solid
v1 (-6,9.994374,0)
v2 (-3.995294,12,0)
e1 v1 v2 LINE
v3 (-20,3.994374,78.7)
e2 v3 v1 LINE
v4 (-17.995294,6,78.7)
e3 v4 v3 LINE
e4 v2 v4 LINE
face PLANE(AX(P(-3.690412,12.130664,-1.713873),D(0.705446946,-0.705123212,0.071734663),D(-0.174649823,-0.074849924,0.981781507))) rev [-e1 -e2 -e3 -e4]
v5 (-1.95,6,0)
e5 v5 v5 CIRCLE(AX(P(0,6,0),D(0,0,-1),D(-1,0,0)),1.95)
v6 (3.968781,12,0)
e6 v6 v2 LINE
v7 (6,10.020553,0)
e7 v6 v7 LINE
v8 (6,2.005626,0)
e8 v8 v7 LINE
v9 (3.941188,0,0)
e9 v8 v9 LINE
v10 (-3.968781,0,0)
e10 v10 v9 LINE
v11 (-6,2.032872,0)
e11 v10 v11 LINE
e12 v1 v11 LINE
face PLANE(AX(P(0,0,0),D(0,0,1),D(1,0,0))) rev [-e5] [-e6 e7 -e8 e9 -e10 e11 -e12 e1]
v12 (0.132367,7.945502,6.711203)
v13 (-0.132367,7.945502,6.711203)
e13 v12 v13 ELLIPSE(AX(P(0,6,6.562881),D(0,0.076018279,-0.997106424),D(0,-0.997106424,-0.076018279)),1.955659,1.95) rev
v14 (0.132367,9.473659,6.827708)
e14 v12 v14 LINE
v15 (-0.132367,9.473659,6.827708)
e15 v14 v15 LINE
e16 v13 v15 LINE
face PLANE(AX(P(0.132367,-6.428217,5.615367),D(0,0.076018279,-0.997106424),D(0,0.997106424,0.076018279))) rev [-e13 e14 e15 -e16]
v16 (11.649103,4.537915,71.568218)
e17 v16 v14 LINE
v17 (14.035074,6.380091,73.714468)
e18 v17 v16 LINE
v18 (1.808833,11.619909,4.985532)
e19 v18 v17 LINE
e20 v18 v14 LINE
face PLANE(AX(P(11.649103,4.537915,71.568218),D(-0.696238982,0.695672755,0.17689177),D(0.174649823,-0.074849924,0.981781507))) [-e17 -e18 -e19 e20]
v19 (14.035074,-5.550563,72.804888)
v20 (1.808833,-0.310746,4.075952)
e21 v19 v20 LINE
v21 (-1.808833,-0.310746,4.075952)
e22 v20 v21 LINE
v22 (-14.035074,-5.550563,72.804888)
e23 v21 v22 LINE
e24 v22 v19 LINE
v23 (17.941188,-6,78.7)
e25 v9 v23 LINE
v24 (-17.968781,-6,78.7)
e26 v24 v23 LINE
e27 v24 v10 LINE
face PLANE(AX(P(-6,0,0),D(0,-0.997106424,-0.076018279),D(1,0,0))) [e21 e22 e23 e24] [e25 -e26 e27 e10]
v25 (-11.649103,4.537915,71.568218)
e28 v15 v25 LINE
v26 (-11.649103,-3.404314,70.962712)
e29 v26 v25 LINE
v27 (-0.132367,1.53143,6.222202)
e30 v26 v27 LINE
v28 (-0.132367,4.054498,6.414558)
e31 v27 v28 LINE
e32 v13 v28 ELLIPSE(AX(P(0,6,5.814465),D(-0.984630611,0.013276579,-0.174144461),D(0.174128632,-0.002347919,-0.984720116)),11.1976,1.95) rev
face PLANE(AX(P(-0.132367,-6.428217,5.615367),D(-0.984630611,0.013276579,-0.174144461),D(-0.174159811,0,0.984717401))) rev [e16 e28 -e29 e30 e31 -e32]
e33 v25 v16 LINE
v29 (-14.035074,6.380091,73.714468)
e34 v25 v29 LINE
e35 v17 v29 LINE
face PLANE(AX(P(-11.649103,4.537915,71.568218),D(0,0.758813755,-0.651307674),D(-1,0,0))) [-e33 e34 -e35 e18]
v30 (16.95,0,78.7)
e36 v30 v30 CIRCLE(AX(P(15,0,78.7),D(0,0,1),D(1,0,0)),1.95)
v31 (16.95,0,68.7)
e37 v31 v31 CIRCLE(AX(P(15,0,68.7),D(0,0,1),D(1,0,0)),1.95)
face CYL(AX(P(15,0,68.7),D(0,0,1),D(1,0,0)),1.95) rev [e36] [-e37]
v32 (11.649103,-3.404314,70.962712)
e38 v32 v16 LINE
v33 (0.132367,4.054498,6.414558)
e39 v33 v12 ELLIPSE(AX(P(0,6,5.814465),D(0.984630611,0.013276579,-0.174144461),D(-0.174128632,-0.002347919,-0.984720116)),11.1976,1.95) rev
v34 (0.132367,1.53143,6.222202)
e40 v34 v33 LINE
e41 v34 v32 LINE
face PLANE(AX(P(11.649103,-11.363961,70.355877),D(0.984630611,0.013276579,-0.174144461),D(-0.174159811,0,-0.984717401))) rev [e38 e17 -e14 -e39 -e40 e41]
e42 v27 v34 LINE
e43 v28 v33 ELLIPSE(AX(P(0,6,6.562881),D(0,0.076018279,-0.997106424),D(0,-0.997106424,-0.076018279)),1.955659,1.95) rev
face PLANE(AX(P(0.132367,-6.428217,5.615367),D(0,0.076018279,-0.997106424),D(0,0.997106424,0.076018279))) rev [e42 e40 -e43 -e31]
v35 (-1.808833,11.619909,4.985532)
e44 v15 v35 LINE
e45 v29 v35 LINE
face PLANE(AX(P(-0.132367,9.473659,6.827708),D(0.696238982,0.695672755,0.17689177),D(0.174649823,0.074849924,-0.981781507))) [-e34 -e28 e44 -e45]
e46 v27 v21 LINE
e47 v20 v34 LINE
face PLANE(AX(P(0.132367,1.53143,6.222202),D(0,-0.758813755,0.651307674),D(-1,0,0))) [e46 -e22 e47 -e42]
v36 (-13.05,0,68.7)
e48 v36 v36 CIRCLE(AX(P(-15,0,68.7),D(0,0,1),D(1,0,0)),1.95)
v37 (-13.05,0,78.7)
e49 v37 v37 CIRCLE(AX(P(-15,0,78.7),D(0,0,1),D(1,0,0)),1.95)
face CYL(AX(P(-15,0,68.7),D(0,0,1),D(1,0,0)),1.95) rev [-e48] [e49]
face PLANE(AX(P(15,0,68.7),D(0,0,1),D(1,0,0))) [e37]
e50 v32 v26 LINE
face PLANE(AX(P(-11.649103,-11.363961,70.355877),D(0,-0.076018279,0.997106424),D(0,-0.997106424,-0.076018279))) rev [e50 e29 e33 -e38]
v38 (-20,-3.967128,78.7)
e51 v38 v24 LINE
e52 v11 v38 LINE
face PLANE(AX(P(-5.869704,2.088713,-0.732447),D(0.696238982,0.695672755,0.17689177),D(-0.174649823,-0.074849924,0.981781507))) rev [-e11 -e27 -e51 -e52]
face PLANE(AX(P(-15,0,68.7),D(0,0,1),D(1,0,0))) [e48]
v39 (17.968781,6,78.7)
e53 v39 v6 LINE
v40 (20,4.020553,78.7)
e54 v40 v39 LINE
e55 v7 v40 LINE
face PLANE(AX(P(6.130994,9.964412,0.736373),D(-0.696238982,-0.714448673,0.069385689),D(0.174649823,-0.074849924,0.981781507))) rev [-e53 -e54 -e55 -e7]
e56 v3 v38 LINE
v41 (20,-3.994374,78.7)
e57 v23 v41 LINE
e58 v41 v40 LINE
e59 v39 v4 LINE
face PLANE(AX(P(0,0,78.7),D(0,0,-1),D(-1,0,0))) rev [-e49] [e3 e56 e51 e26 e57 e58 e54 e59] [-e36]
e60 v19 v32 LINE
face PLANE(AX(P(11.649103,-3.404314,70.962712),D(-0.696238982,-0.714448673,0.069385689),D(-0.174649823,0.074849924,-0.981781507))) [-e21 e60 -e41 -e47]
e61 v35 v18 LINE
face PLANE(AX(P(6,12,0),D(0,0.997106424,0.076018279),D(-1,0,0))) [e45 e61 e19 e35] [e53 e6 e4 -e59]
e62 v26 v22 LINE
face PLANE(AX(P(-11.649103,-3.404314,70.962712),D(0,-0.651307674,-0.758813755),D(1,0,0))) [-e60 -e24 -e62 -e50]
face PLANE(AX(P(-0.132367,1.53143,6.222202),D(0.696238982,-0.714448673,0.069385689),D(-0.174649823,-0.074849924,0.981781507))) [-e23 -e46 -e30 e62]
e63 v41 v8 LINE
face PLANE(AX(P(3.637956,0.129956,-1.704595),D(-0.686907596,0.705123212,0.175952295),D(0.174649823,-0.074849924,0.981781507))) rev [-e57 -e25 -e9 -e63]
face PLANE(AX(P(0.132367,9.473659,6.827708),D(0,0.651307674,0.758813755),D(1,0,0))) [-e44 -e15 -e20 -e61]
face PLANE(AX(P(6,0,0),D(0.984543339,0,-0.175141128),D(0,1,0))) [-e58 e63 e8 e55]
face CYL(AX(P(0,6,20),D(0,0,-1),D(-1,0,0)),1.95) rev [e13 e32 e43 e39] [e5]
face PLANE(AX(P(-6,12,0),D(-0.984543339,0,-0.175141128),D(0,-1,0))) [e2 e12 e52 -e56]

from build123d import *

# Parameters (mm, degrees)
SKETCH3_R          = 1.95
CUT_EXTRUDE1_DEPTH = 20
SKETCH4_R          = 1.95
CUT_EXTRUDE2_DEPTH = 10
CUT_EXTRUDE3_DEPTH = 83.297374679
CHAMFER1_SIZE      = 2
CHAMFER1_SIZE_2    = 1.973894665
CHAMFER1_SIZE_3    = 2.02716926


with BuildPart() as part:
    # Loft1: read off the stored shape, not the designer's step
    # Loft1: loft between two sections, ruled curve by curve
    loft1_from = [
        Edge.make_line((-20, 6, 78.7), (20, 6, 78.7)),
        Edge.make_line((20, 6, 78.7), (20, -6, 78.7)),
        Edge.make_line((20, -6, 78.7), (-20, -6, 78.7)),
        Edge.make_line((-20, -6, 78.7), (-20, 6, 78.7)),
    ]
    loft1_to = [
        Edge.make_line((-6, 12, 0), (6, 12, 0)),
        Edge.make_line((6, 12, 0), (6, 0, 0)),
        Edge.make_line((6, 0, 0), (-6, 0, 0)),
        Edge.make_line((-6, 0, 0), (-6, 12, 0)),
    ]
    loft1 = Solid(Shell([*[Face.make_surface_from_curves(loft1_from[k], loft1_to[k]) for k in range(4)], Face(Wire(loft1_from)), Face(Wire(loft1_to))]))
    add(loft1)

    # Sketch3 → Cut-Extrude1 (cut)
    with BuildSketch(Plane(origin=(0, 0, 0), x_dir=(-1, 0, 0), z_dir=(0, 0, -1))):
        with Locations((0, 6)):
            Circle(SKETCH3_R)
    extrude(amount=-CUT_EXTRUDE1_DEPTH, mode=Mode.SUBTRACT)

    # Sketch4 → Cut-Extrude2 (cut)
    with BuildSketch(Plane.XY.offset(78.7)):
        with Locations((15, 0)):
            Circle(SKETCH4_R)
        with Locations((-15, 0)):
            Circle(SKETCH4_R)
    extrude(amount=-CUT_EXTRUDE2_DEPTH, mode=Mode.SUBTRACT)

    # Sketch5 → Cut-Extrude3 (cut, through all)
    with BuildSketch(Plane(origin=(0, 11.930654655, 0.90957977), x_dir=(1, 0, 0), z_dir=(0, 0.9971064242500265, 0.07601827885006555))):
        Polygon((-0.132366824, -6.087780654), (-11.649103048, -71.016165915), (11.649103048, -71.016165915), (0.132366824, -6.087780654), align=None)
    extrude(amount=-CUT_EXTRUDE3_DEPTH, mode=Mode.SUBTRACT)

    # Chamfer1
    # the kernel refuses this chamfer: 2.02716926, 2, 1.973894665 mm, written as the material it takes off along each edge
    with BuildSketch(Plane(origin=(-16.792469024, -5.398526703, 70.81067526), x_dir=(0, 0.997106424250026, 0.07601827885007145), z_dir=(1, 0, 0))) as chamfer1_piece_1_section:
        Polygon((CHAMFER1_SIZE, 0), (0, CHAMFER1_SIZE), (0, 0), align=None)
    chamfer1_piece_1 = extrude(amount=33.584938049, mode=Mode.PRIVATE)
    chamfer1_piece_1 = split(chamfer1_piece_1, bisect_by=Plane(origin=(-15.283859564, -6.946592893, 70.961020054), z_dir=(0.6962389816670421, -0.7144486731771176, 0.06938568874556392)), keep=Keep.TOP, mode=Mode.PRIVATE)
    chamfer1_piece_1 = split(chamfer1_piece_1, bisect_by=Plane(origin=(-2.020822768, 9.759462645, 69.338564567), z_dir=(-0.6962389816670431, -0.7144486731771169, 0.0693856887455642)), keep=Keep.TOP, mode=Mode.PRIVATE)
    add(chamfer1_piece_1, mode=Mode.SUBTRACT)
    with BuildSketch(Plane(origin=(-12.547391008, -5.783507257, 75.86033686), x_dir=(0, 0.9971064242500265, 0.07601827885006568), z_dir=(0.1746498234023745, 0.0748499243153034, -0.9817815072690628))) as chamfer1_piece_2_section:
        Polygon((CHAMFER1_SIZE, 0), (0, -CHAMFER1_SIZE), (0, 0), align=None)
    chamfer1_piece_2 = extrude(amount=76.22860352, mode=Mode.PRIVATE)
    chamfer1_piece_2 = split(chamfer1_piece_2, bisect_by=Plane(origin=(-12.547391008, 32.845065601, 42.704525209), z_dir=(0, -0.7588137546208746, 0.6513076736828541)), keep=Keep.TOP, mode=Mode.PRIVATE)
    chamfer1_piece_2 = split(chamfer1_piece_2, bisect_by=Plane(origin=(-12.547391008, -7.194759635, 74.216140486), z_dir=(0, -0.6513076736828518, -0.7588137546208766)), keep=Keep.TOP, mode=Mode.PRIVATE)
    add(chamfer1_piece_2, mode=Mode.SUBTRACT)
    with BuildSketch(Plane(origin=(12.547391008, -5.783507257, 75.86033686), x_dir=(1.43368408515118e-15, 0.9971064242500265, 0.07601827885006535), z_dir=(-0.17464982340237462, 0.07484992431530343, -0.9817815072690628))) as chamfer1_piece_3_section:
        Polygon((CHAMFER1_SIZE, 0), (0, CHAMFER1_SIZE), (0, 0), align=None)
    chamfer1_piece_3 = extrude(amount=76.22860352, mode=Mode.PRIVATE)
    chamfer1_piece_3 = split(chamfer1_piece_3, bisect_by=Plane(origin=(12.547391008, 32.845065601, 42.704525209), z_dir=(0, -0.7588137546208746, 0.6513076736828541)), keep=Keep.TOP, mode=Mode.PRIVATE)
    chamfer1_piece_3 = split(chamfer1_piece_3, bisect_by=Plane(origin=(12.547391008, -7.194759635, 74.216140486), z_dir=(0, -0.6513076736828518, -0.7588137546208766)), keep=Keep.TOP, mode=Mode.PRIVATE)
    add(chamfer1_piece_3, mode=Mode.SUBTRACT)
    with BuildSketch(Plane(origin=(-16.792469024, 6.532127952, 71.72025503), x_dir=(0, -0.07601827885006952, 0.9971064242500263), z_dir=(1, 0, 0))) as chamfer1_piece_4_section:
        Polygon((CHAMFER1_SIZE, 0), (0, CHAMFER1_SIZE), (0, 0), align=None)
    chamfer1_piece_4 = extrude(amount=33.584938049, mode=Mode.PRIVATE)
    chamfer1_piece_4 = split(chamfer1_piece_4, bisect_by=Plane(origin=(-15.283859564, 8.039510514, 72.103543821), z_dir=(0.6962389816670405, 0.6956727551266126, 0.1768917696835863)), keep=Keep.TOP, mode=Mode.PRIVATE)
    chamfer1_piece_4 = split(chamfer1_piece_4, bisect_by=Plane(origin=(-2.020822768, -8.227505047, 67.967258263), z_dir=(-0.6962389816670409, 0.6956727551266121, 0.17689176968358636)), keep=Keep.TOP, mode=Mode.PRIVATE)
    add(chamfer1_piece_4, mode=Mode.SUBTRACT)
    with BuildSketch(Plane(origin=(12.547391008, 6.147147398, 76.769916631), x_dir=(0.9846306105263636, 0.013276578976513069, -0.17414446090864058), z_dir=(-0.17464982340237462, 0.07484992431530339, -0.9817815072690629))) as chamfer1_piece_5_section:
        Polygon((CHAMFER1_SIZE, 0), (0, CHAMFER1_SIZE), (0, 0), align=None)
    chamfer1_piece_5 = extrude(amount=76.22860352, mode=Mode.PRIVATE)
    chamfer1_piece_5 = split(chamfer1_piece_5, bisect_by=Plane(origin=(12.547391008, 7.791343772, 75.358664253), z_dir=(0, 0.7588137546208767, -0.6513076736828517)), keep=Keep.TOP, mode=Mode.PRIVATE)
    chamfer1_piece_5 = split(chamfer1_piece_5, bisect_by=Plane(origin=(12.547391008, -27.008664253, 38.141343772), z_dir=(0, 0.6513076736828546, 0.7588137546208742)), keep=Keep.TOP, mode=Mode.PRIVATE)
    add(chamfer1_piece_5, mode=Mode.SUBTRACT)
    with BuildSketch(Plane(origin=(0.765921135, 11.852852602, 1.930083369), x_dir=(-0.9846306105263636, 0.013276578976513059, -0.17414446090864047), z_dir=(-0.1746498234023745, -0.07484992431530339, 0.9817815072690629))) as chamfer1_piece_6_section:
        Polygon((CHAMFER1_SIZE, 0), (0, CHAMFER1_SIZE), (0, 0), align=None)
    chamfer1_piece_6 = extrude(amount=76.22860352, mode=Mode.PRIVATE)
    chamfer1_piece_6 = split(chamfer1_piece_6, bisect_by=Plane(origin=(0.765921135, -26.775720256, 35.08589502), z_dir=(0, 0.7588137546208767, -0.6513076736828517)), keep=Keep.TOP, mode=Mode.PRIVATE)
    chamfer1_piece_6 = split(chamfer1_piece_6, bisect_by=Plane(origin=(0.765921135, 13.26410498, 3.574279744), z_dir=(0, 0.6513076736828546, 0.7588137546208742)), keep=Keep.TOP, mode=Mode.PRIVATE)
    add(chamfer1_piece_6, mode=Mode.SUBTRACT)
    with BuildSketch(Plane(origin=(-5.2757328, -0.462782607, 6.070165199), x_dir=(0, 0.0760182788500654, -0.9971064242500265), z_dir=(1, 0, 0))) as chamfer1_piece_7_section:
        Polygon((CHAMFER1_SIZE, 0), (0, CHAMFER1_SIZE), (0, 0), align=None)
    chamfer1_piece_7 = extrude(amount=10.5514656, mode=Mode.PRIVATE)
    chamfer1_piece_7 = split(chamfer1_piece_7, bisect_by=Plane(origin=(-3.767123339, -2.010848797, 6.220509994), z_dir=(0.6962389816670421, -0.7144486731771176, 0.06938568874556392)), keep=Keep.TOP, mode=Mode.PRIVATE)
    chamfer1_piece_7 = split(chamfer1_piece_7, bisect_by=Plane(origin=(-1.669532821, 3.237735258, 5.710779017), z_dir=(-0.6962389816670431, -0.7144486731771169, 0.0693856887455642)), keep=Keep.TOP, mode=Mode.PRIVATE)
    add(chamfer1_piece_7, mode=Mode.SUBTRACT)
    with BuildSketch(Plane(origin=(5.2757328, 11.467872048, 6.97974497), x_dir=(0, 0.0760182788500616, -0.9971064242500267), z_dir=(-1, 0, 0))) as chamfer1_piece_8_section:
        Polygon((CHAMFER1_SIZE, 0), (0, CHAMFER1_SIZE), (0, 0), align=None)
    chamfer1_piece_8 = extrude(amount=10.5514656, mode=Mode.PRIVATE)
    chamfer1_piece_8 = split(chamfer1_piece_8, bisect_by=Plane(origin=(1.669532821, 7.864604864, 6.063526383), z_dir=(0.6962389816670405, 0.6956727551266126, 0.1768917696835863)), keep=Keep.TOP, mode=Mode.PRIVATE)
    chamfer1_piece_8 = split(chamfer1_piece_8, bisect_by=Plane(origin=(3.767123339, 12.97525461, 7.36303376), z_dir=(-0.6962389816670409, 0.6956727551266121, 0.17689176968358636)), keep=Keep.TOP, mode=Mode.PRIVATE)
    add(chamfer1_piece_8, mode=Mode.SUBTRACT)
    with BuildSketch(Plane(origin=(20.898287959, 5.615019446, 83.7496616), x_dir=(-0.9846306105263637, -0.013276578976516254, 0.17414446090864033), z_dir=(-0.17464982340237456, 0.07484992431530338, -0.9817815072690627))) as chamfer1_piece_9:
        Polygon((CHAMFER1_SIZE, 0), (CHAMFER1_SIZE_2 * 0.0133139270738, -CHAMFER1_SIZE_2 * 0.999911365776), (0, 0), align=None)
    extrude(amount=90.447133647, mode=Mode.SUBTRACT)
    with BuildSketch(Plane(origin=(-20.898287959, 5.615019446, 83.7496616), x_dir=(0.9846306105263636, -0.013276578976516233, 0.17414446090864033), z_dir=(0.17464982340237456, 0.07484992431530338, -0.9817815072690627))) as chamfer1_piece_10:
        Polygon((CHAMFER1_SIZE_2, 0), (CHAMFER1_SIZE * 0.0133139270733, CHAMFER1_SIZE * 0.999911365745), (0, 0), align=None)
    extrude(amount=90.447133647, mode=Mode.SUBTRACT)
    with BuildSketch(Plane(origin=(-20.910812675, -6.390348289, 83.820068396), x_dir=(-0.013109300142731543, 0.9971948098691615, 0.07369299437378306), z_dir=(0.17464982340237456, 0.07484992431530338, -0.9817815072690627))) as chamfer1_piece_11:
        Polygon((CHAMFER1_SIZE_3, 0), (-CHAMFER1_SIZE * 0.0133139270733, CHAMFER1_SIZE * 0.999911365745), (0, 0), align=None)
    extrude(amount=90.590560255, mode=Mode.SUBTRACT)
    with BuildSketch(Plane(origin=(20.910812675, -6.390348289, 83.820068396), x_dir=(0.01310930014273147, 0.9971948098691616, 0.07369299437378309), z_dir=(-0.17464982340237456, 0.07484992431530338, -0.9817815072690627))) as chamfer1_piece_12:
        Polygon((CHAMFER1_SIZE, 0), (-CHAMFER1_SIZE_3 * 0.0133139270755, -CHAMFER1_SIZE_3 * 0.99991136591), (0, 0), align=None)
    extrude(amount=90.590560255, mode=Mode.SUBTRACT)


solid = part.part
